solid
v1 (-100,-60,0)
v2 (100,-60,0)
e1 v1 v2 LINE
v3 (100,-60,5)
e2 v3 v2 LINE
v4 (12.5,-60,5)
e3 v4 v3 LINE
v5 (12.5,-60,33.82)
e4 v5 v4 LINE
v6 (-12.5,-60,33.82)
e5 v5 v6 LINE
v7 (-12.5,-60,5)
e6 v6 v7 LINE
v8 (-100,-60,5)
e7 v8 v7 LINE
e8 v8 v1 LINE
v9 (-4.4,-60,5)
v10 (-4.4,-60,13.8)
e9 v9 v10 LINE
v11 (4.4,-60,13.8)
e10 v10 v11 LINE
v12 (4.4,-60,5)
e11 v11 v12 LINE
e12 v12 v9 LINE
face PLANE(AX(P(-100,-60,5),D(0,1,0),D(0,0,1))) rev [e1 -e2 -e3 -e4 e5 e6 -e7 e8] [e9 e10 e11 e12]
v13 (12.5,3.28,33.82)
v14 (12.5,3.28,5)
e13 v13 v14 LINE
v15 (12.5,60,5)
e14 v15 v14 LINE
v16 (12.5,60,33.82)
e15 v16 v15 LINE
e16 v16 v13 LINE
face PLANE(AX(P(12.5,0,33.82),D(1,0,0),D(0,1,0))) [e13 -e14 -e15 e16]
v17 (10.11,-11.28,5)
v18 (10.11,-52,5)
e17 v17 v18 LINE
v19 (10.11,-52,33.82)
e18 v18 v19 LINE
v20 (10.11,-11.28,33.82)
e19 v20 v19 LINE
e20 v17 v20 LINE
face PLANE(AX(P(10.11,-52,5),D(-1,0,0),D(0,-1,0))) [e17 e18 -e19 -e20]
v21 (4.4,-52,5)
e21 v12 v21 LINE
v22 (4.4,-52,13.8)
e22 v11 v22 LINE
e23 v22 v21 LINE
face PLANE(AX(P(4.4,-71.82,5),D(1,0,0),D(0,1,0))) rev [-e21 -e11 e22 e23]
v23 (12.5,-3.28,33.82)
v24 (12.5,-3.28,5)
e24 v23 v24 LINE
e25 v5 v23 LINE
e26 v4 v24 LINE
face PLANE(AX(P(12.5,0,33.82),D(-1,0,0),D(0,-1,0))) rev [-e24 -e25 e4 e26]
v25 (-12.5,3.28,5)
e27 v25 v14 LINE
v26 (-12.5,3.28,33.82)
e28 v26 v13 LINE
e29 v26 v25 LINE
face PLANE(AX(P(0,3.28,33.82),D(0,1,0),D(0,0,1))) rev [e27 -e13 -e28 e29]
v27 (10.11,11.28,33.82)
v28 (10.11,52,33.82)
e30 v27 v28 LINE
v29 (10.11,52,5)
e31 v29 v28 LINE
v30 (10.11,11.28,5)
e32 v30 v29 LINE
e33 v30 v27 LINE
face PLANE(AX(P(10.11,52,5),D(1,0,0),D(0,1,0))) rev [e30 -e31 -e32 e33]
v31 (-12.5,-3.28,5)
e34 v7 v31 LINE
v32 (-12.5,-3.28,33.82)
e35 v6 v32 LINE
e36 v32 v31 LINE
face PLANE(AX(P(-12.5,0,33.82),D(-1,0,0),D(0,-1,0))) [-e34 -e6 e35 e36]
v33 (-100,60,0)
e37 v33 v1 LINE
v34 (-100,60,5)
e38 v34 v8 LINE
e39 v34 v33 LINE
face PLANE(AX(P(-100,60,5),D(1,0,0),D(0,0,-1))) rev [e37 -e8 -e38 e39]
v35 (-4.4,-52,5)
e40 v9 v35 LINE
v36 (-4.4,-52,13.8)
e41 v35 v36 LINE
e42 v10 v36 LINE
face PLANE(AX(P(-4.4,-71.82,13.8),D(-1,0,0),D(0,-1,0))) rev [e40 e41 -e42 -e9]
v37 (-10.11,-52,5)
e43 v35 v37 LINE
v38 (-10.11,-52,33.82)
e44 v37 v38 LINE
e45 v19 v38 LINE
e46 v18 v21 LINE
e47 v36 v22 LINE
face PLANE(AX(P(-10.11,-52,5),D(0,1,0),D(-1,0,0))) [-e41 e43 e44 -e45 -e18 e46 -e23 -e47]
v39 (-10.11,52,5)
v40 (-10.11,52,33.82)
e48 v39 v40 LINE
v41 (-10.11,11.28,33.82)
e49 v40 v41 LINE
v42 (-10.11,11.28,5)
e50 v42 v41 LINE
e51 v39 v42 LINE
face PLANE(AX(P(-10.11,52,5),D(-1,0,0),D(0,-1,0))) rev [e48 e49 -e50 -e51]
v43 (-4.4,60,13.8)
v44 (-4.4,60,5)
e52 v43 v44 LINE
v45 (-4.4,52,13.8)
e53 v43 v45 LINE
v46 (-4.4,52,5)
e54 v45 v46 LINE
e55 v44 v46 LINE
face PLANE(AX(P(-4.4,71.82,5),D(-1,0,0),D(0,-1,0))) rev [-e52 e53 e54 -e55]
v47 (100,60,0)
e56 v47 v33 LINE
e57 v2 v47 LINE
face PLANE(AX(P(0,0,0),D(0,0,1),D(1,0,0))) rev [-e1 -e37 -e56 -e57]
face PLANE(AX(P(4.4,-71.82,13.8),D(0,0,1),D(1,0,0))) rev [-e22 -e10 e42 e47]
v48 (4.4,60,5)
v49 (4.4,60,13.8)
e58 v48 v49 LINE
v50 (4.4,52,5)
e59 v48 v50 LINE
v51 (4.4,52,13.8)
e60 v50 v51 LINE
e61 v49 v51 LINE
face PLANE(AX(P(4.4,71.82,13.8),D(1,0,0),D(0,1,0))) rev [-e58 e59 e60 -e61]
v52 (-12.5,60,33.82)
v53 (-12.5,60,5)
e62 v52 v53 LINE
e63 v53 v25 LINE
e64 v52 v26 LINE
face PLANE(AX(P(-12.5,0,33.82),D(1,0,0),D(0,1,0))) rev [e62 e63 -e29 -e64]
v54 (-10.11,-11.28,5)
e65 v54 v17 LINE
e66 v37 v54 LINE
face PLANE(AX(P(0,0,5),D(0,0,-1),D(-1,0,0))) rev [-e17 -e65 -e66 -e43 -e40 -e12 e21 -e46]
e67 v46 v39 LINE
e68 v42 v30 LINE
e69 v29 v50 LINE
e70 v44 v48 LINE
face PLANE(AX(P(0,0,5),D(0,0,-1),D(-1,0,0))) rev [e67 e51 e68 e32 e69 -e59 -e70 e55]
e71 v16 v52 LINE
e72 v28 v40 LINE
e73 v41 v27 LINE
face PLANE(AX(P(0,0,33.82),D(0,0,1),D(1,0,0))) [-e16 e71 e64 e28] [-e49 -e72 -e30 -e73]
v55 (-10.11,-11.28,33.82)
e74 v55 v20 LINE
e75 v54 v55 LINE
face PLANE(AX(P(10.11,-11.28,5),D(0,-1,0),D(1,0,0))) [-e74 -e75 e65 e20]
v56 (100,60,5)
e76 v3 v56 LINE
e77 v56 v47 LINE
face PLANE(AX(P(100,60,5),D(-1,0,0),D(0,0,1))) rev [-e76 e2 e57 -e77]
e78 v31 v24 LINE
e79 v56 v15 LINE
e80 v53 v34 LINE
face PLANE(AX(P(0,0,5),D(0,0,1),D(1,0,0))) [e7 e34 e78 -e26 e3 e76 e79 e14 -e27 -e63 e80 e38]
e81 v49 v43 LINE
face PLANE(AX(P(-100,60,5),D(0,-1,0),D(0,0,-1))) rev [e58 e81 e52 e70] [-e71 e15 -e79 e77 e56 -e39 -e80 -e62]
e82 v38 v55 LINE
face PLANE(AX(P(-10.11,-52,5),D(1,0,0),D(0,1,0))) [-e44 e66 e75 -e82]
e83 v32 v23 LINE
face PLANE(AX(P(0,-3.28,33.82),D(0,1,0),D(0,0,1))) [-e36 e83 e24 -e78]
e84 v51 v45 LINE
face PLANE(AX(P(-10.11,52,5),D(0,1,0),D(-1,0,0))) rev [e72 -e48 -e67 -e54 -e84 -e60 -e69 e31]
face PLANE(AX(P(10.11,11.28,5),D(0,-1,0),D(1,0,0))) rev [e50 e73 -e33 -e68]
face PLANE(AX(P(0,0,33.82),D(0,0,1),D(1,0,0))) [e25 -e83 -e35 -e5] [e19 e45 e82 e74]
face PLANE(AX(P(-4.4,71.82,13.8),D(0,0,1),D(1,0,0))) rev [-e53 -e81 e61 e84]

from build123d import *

# Parameters (mm, degrees)
SKETCH1_W           = 200
SKETCH1_H           = 120
BOSS_EXTRUDE1_DEPTH = 5
SKETCH2_W           = 25
SKETCH2_H           = 56.72
BOSS_EXTRUDE2_DEPTH = 28.82
SKETCH3_W           = 20.22
SKETCH3_H           = 40.72
CUT_EXTRUDE1_DEPTH  = 28.82
SKETCH4_W           = 8.8
SKETCH4_H           = 8.8
CUT_EXTRUDE2_DEPTH  = 19.82
SKETCH5_W           = 8.8
SKETCH5_H           = 8.8
CUT_EXTRUDE3_DEPTH  = 19.82


with BuildPart() as part:
    # Sketch1 → Boss-Extrude1 (new body)
    with BuildSketch(Plane.XY):
        Rectangle(SKETCH1_W, SKETCH1_H)
    boss_extrude1 = extrude(amount=BOSS_EXTRUDE1_DEPTH)

    # Sketch2 → Boss-Extrude2 (add)
    with BuildSketch(Plane.XY.offset(5)):
        with Locations((0, 31.64)):
            Rectangle(SKETCH2_W, SKETCH2_H)
    boss_extrude2 = extrude(amount=BOSS_EXTRUDE2_DEPTH)

    # Sketch3 → Cut-Extrude1 (cut)
    with BuildSketch(Plane.XY.offset(33.82)):
        with Locations((0, 31.64)):
            Rectangle(SKETCH3_W, SKETCH3_H)
    cut_extrude1 = extrude(amount=-CUT_EXTRUDE1_DEPTH, mode=Mode.SUBTRACT)

    # Sketch4 → Cut-Extrude2 (cut)
    with BuildSketch(Plane.XZ.offset(-52)):
        with Locations((0, 9.4)):
            Rectangle(SKETCH4_W, SKETCH4_H)
    extrude(amount=-CUT_EXTRUDE2_DEPTH, mode=Mode.SUBTRACT)

    # Mirror1: Boss-Extrude1, Boss-Extrude2, Cut-Extrude1 across plane
    add(boss_extrude1.mirror(Plane.ZX))
    add(boss_extrude2.mirror(Plane.ZX))
    add(cut_extrude1.mirror(Plane.ZX), mode=Mode.SUBTRACT)

    # Sketch5 → Cut-Extrude3 (cut)
    with BuildSketch(Plane(origin=(0, -52, 0), x_dir=(1, 0, 0), z_dir=(0, 1, 0))):
        with Locations((0, -9.4)):
            Rectangle(SKETCH5_W, SKETCH5_H)
    extrude(amount=-CUT_EXTRUDE3_DEPTH, mode=Mode.SUBTRACT)


solid = part.part
